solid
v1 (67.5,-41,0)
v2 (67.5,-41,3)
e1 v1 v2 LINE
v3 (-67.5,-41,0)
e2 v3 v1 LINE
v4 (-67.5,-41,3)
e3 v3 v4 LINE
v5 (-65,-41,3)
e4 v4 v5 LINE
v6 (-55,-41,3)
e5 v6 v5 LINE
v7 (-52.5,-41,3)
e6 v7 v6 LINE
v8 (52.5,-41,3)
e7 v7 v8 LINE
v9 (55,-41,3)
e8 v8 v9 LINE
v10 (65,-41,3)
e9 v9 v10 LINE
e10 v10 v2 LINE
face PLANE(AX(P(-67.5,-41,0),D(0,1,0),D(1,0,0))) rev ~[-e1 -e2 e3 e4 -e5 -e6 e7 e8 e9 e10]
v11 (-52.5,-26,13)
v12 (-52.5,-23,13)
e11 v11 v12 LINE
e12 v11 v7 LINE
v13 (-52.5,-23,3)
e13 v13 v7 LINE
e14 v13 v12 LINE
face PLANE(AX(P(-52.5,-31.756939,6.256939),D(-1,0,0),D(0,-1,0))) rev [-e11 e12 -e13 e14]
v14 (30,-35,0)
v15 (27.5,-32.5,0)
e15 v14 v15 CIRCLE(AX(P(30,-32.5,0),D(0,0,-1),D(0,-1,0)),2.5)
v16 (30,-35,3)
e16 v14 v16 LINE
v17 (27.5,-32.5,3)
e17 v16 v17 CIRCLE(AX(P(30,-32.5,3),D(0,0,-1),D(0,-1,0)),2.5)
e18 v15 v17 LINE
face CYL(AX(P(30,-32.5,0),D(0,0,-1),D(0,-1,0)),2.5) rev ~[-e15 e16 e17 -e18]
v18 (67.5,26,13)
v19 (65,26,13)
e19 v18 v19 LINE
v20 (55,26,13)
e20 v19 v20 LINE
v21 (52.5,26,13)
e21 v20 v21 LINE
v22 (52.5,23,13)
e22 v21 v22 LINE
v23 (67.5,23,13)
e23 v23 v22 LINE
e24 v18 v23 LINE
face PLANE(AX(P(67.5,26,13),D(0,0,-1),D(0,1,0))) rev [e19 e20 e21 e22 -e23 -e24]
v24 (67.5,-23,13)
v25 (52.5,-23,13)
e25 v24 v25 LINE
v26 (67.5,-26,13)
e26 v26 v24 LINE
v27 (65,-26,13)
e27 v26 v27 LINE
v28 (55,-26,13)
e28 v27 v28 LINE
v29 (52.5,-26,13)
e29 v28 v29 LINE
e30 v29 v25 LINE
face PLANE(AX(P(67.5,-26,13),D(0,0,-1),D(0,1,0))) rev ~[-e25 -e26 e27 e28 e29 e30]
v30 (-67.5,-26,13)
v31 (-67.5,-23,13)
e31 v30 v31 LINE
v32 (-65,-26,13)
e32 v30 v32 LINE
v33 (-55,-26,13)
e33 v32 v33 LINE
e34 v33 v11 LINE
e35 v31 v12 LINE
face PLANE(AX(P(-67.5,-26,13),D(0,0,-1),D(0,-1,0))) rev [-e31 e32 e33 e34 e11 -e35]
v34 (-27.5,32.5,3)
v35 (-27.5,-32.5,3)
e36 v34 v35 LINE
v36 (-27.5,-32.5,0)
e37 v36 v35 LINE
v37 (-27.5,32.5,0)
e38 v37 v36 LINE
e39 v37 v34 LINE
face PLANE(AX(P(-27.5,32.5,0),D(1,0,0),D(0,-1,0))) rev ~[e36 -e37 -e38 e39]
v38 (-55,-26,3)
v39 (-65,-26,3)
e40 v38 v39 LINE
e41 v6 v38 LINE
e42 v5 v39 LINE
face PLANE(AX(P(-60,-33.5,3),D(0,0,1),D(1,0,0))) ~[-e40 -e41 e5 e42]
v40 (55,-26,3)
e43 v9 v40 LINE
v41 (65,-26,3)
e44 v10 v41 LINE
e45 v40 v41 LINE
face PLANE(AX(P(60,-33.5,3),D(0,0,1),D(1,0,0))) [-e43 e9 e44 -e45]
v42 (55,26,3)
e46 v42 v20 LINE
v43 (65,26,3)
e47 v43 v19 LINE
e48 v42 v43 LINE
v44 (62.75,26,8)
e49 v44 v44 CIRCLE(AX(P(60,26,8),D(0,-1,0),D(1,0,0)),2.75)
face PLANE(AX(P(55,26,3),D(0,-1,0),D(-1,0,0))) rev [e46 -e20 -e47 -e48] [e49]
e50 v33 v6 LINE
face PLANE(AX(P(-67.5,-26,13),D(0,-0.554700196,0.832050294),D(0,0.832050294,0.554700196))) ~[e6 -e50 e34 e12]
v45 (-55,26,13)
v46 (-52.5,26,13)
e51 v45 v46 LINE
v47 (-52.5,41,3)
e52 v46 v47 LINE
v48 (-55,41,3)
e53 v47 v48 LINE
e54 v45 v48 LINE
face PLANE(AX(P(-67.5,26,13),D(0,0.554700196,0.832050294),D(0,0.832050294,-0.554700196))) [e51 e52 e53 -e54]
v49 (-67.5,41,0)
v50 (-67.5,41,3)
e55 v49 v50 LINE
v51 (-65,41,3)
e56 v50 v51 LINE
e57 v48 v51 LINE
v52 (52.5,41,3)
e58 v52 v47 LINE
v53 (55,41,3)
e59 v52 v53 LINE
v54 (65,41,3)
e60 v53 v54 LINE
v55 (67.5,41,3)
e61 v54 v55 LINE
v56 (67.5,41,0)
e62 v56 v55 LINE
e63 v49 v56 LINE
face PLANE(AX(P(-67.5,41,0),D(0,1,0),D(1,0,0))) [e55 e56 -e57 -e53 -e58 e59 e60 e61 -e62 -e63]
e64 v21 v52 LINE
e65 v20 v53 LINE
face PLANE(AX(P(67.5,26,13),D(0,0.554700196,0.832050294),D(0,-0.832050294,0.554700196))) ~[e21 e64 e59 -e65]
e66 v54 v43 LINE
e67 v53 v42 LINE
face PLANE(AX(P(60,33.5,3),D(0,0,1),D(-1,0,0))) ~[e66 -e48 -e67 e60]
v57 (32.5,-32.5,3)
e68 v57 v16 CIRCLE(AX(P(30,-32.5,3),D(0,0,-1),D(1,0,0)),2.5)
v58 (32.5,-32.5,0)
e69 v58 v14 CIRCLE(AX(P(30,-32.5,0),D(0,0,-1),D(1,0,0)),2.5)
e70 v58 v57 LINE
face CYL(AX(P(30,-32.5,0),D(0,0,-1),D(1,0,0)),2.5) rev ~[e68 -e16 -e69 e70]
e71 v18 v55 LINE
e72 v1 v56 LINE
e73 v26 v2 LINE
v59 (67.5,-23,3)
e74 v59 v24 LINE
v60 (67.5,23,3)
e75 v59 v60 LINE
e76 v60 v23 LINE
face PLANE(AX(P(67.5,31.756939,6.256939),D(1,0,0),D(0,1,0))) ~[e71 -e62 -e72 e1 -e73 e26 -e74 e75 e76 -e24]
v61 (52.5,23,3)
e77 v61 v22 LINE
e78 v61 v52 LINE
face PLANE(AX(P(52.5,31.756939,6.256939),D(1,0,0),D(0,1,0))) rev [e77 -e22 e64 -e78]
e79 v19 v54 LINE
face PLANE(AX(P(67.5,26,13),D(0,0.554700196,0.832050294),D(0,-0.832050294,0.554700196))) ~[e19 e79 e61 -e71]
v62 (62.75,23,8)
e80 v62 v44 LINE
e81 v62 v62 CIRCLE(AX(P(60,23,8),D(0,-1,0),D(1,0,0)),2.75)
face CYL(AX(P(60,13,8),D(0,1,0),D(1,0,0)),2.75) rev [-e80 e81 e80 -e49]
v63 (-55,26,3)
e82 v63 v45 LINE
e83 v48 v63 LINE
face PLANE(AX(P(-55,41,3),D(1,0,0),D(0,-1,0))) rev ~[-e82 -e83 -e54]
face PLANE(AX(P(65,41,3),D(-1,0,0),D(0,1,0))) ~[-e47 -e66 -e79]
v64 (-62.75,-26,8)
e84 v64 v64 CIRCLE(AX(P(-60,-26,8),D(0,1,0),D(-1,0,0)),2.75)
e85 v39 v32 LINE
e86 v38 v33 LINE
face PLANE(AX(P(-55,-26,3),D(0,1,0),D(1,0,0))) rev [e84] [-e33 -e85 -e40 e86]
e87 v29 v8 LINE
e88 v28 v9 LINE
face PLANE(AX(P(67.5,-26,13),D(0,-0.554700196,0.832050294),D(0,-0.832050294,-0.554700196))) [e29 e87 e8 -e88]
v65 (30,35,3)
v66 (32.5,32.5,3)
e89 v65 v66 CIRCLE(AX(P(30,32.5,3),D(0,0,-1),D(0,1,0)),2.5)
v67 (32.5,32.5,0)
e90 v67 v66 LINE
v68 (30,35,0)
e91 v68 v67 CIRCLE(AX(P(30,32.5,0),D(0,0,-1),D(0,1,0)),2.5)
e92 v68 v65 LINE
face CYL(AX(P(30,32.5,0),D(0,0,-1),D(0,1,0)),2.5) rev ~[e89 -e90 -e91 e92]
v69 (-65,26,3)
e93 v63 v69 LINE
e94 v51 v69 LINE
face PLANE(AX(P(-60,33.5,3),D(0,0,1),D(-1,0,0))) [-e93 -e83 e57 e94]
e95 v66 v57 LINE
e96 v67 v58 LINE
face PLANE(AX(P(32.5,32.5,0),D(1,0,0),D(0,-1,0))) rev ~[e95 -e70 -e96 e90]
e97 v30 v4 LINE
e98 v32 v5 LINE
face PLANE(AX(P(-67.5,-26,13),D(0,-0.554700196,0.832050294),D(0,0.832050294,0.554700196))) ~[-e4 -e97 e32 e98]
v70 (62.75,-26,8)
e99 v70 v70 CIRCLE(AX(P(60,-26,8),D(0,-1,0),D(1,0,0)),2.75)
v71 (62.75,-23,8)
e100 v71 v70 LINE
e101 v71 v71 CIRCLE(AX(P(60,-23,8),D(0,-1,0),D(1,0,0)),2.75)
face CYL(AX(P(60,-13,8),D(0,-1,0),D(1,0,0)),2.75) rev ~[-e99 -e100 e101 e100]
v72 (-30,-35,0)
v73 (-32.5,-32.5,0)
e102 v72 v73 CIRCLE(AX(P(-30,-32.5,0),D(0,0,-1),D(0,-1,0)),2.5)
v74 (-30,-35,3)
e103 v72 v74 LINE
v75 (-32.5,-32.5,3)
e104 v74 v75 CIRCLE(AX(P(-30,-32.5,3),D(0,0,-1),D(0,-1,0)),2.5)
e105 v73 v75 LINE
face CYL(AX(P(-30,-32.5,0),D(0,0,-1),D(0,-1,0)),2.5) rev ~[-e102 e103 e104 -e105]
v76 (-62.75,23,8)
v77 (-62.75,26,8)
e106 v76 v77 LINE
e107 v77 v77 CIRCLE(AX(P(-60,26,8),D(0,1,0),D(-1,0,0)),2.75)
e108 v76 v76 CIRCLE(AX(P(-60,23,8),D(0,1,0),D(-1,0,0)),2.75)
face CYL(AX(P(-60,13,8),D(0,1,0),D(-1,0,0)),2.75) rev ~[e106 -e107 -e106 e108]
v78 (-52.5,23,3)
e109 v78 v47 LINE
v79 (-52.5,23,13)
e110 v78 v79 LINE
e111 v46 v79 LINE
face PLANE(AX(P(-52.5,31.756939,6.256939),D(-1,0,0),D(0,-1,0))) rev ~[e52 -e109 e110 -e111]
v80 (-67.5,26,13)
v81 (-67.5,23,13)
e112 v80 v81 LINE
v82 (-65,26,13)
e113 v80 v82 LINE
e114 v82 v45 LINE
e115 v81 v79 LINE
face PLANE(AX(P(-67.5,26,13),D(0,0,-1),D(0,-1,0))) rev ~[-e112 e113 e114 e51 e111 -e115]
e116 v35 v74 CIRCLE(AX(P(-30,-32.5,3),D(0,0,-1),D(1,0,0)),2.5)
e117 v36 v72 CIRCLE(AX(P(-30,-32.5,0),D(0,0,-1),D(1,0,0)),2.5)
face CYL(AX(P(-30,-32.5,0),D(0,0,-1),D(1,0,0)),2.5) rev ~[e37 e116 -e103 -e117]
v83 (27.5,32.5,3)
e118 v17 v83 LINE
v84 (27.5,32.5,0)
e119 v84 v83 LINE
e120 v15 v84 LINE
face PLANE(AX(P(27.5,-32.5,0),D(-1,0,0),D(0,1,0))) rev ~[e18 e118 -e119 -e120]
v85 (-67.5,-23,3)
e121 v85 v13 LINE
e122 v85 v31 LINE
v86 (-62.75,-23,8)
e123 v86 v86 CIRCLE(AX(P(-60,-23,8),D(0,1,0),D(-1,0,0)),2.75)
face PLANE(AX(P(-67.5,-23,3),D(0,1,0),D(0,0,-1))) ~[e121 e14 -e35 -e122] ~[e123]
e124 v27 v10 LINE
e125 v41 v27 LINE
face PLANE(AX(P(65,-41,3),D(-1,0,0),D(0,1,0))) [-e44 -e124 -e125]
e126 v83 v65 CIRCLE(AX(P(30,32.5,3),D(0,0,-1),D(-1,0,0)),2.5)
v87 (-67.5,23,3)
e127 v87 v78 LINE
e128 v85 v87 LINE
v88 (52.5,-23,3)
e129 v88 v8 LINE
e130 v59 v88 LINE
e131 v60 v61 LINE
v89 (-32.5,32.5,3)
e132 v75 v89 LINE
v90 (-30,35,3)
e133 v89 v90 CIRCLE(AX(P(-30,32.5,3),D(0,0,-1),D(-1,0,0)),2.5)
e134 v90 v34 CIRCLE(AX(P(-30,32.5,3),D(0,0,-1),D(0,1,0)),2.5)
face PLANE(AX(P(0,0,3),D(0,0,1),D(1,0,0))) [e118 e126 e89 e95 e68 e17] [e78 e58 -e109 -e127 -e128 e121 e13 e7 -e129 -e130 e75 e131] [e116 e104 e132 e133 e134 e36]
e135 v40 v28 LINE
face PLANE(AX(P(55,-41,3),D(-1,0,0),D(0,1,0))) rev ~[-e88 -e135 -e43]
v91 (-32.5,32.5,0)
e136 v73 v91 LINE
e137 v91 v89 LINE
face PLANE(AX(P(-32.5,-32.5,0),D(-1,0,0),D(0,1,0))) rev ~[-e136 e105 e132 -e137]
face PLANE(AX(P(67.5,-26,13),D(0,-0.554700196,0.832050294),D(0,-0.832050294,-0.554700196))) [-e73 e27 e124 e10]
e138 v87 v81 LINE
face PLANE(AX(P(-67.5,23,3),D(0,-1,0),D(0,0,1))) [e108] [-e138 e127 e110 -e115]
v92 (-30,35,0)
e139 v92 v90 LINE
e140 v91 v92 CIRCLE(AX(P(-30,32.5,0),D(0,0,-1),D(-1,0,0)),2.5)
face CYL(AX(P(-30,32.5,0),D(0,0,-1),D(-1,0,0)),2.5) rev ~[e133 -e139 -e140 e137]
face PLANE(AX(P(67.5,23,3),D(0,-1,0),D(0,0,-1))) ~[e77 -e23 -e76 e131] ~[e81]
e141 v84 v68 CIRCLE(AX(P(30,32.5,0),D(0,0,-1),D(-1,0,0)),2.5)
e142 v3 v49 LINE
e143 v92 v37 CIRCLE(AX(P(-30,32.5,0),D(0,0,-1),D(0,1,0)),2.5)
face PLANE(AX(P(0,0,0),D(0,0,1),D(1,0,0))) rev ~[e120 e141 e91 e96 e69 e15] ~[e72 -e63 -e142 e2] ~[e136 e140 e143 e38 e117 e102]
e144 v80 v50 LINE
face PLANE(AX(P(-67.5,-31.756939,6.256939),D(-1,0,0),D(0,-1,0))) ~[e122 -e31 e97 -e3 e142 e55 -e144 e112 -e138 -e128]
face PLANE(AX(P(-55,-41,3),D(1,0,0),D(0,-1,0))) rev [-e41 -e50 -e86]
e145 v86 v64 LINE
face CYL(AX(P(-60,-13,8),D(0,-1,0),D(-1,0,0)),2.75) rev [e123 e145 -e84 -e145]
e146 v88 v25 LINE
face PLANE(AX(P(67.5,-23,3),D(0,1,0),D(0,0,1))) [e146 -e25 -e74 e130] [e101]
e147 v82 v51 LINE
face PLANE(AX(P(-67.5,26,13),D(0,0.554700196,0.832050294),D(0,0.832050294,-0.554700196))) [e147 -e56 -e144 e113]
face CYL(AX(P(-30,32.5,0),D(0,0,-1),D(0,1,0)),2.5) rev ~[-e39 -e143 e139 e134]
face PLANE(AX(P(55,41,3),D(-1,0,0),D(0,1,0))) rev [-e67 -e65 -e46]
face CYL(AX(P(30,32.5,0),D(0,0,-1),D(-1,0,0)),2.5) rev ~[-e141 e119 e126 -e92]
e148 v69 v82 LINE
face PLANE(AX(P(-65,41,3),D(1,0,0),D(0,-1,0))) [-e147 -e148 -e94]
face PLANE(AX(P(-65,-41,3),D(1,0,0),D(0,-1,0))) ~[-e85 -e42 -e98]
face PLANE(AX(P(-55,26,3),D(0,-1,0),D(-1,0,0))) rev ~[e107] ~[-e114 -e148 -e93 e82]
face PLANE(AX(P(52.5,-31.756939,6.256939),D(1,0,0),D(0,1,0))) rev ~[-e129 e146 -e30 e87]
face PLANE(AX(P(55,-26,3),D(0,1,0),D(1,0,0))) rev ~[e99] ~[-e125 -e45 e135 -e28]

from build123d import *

# Parameters (mm, degrees)
F0_W      = 135
F0_H      = 82
F1_DEPTH  = 3
F2_W      = 3
F2_H      = 10
F3_DEPTH  = 15
F4_DEPTH  = 15
F5_W      = 10
F5_H      = 15
F6_DEPTH  = 25
F8_D      = 5.5
F8_DEPTH  = 10
F8_TIP    = 1.6523667023
F12_COUNT = 2


# Not quite as in the source:
# - a feature names something its author has since deleted; it is built from what else it names


with BuildPart() as f1:
    # F0 (on Top) → F1 (new body)
    with BuildSketch(Plane.XY):
        Rectangle(F0_W, F0_H)
        with BuildLine():
            Line((-32.5, -32.5), (-32.5, 32.5))
            ThreePointArc((-32.5, 32.5), (-31.767766953, 34.267766953), (-30, 35))
            ThreePointArc((-30, 35), (-28.232233047, 34.267766953), (-27.5, 32.5))
            Line((-27.5, 32.5), (-27.5, -32.5))
            ThreePointArc((-27.5, -32.5), (-28.232233047, -34.267766953), (-30, -35))
            ThreePointArc((-30, -35), (-31.767766953, -34.267766953), (-32.5, -32.5))
        make_face(mode=Mode.SUBTRACT)
        with BuildLine():
            Line((27.5, -32.5), (27.5, 32.5))
            ThreePointArc((27.5, 32.5), (28.232233047, 34.267766953), (30, 35))
            ThreePointArc((30, 35), (31.767766953, 34.267766953), (32.5, 32.5))
            Line((32.5, 32.5), (32.5, -32.5))
            ThreePointArc((32.5, -32.5), (31.767766953, -34.267766953), (30, -35))
            ThreePointArc((30, -35), (28.232233047, -34.267766953), (27.5, -32.5))
        make_face(mode=Mode.SUBTRACT)
    extrude(amount=F1_DEPTH)

    # F2 (on face) → F3 (join)
    with BuildSketch(Plane.YZ.offset(67.5)):
        with Locations((-24.5, 8)):
            Rectangle(F2_W, F2_H)
    extrude(amount=-F3_DEPTH)

    # F2 (on face) → F4 (join)
    with BuildSketch(Plane.YZ.offset(67.5)):
        Polygon((-41, 3), (-26, 3), (-26, 13), align=None)
    extrude(amount=-F4_DEPTH)

    # F5 (on face) → F6 (cut)
    with BuildSketch(Plane.XY.offset(3)):
        with Locations((60, -33.5)):
            Rectangle(F5_W, F5_H)
    extrude(amount=F6_DEPTH, mode=Mode.SUBTRACT)

    # F8
    with Locations(Plane(origin=(0, -23, 0), x_dir=(-1, 0, 0), z_dir=(0, 1, 0))):
        with Locations((-60, 8)):
            Hole(F8_D / 2, depth=F8_DEPTH)
            with Locations((0, 0, -(F8_DEPTH + F8_TIP / 2))):  # 118° drill point
                Cone(0, F8_D / 2, F8_TIP, mode=Mode.SUBTRACT)

    # F10: F1 across plane


with BuildPart() as f1_1:
    add(f1.part)
    add(f1.part.mirror(Plane.YZ))

    # F12: F1 ×2 about axis
    f12_axis = Axis((0, 0, 10.3634241968), (0, 0, -1))


with BuildPart() as f1_2:
    add(f1_1.part)
    for i in range(1, F12_COUNT):
        add(f1_1.part.rotate(f12_axis, i * 360 / F12_COUNT))


solid = f1_2.part
